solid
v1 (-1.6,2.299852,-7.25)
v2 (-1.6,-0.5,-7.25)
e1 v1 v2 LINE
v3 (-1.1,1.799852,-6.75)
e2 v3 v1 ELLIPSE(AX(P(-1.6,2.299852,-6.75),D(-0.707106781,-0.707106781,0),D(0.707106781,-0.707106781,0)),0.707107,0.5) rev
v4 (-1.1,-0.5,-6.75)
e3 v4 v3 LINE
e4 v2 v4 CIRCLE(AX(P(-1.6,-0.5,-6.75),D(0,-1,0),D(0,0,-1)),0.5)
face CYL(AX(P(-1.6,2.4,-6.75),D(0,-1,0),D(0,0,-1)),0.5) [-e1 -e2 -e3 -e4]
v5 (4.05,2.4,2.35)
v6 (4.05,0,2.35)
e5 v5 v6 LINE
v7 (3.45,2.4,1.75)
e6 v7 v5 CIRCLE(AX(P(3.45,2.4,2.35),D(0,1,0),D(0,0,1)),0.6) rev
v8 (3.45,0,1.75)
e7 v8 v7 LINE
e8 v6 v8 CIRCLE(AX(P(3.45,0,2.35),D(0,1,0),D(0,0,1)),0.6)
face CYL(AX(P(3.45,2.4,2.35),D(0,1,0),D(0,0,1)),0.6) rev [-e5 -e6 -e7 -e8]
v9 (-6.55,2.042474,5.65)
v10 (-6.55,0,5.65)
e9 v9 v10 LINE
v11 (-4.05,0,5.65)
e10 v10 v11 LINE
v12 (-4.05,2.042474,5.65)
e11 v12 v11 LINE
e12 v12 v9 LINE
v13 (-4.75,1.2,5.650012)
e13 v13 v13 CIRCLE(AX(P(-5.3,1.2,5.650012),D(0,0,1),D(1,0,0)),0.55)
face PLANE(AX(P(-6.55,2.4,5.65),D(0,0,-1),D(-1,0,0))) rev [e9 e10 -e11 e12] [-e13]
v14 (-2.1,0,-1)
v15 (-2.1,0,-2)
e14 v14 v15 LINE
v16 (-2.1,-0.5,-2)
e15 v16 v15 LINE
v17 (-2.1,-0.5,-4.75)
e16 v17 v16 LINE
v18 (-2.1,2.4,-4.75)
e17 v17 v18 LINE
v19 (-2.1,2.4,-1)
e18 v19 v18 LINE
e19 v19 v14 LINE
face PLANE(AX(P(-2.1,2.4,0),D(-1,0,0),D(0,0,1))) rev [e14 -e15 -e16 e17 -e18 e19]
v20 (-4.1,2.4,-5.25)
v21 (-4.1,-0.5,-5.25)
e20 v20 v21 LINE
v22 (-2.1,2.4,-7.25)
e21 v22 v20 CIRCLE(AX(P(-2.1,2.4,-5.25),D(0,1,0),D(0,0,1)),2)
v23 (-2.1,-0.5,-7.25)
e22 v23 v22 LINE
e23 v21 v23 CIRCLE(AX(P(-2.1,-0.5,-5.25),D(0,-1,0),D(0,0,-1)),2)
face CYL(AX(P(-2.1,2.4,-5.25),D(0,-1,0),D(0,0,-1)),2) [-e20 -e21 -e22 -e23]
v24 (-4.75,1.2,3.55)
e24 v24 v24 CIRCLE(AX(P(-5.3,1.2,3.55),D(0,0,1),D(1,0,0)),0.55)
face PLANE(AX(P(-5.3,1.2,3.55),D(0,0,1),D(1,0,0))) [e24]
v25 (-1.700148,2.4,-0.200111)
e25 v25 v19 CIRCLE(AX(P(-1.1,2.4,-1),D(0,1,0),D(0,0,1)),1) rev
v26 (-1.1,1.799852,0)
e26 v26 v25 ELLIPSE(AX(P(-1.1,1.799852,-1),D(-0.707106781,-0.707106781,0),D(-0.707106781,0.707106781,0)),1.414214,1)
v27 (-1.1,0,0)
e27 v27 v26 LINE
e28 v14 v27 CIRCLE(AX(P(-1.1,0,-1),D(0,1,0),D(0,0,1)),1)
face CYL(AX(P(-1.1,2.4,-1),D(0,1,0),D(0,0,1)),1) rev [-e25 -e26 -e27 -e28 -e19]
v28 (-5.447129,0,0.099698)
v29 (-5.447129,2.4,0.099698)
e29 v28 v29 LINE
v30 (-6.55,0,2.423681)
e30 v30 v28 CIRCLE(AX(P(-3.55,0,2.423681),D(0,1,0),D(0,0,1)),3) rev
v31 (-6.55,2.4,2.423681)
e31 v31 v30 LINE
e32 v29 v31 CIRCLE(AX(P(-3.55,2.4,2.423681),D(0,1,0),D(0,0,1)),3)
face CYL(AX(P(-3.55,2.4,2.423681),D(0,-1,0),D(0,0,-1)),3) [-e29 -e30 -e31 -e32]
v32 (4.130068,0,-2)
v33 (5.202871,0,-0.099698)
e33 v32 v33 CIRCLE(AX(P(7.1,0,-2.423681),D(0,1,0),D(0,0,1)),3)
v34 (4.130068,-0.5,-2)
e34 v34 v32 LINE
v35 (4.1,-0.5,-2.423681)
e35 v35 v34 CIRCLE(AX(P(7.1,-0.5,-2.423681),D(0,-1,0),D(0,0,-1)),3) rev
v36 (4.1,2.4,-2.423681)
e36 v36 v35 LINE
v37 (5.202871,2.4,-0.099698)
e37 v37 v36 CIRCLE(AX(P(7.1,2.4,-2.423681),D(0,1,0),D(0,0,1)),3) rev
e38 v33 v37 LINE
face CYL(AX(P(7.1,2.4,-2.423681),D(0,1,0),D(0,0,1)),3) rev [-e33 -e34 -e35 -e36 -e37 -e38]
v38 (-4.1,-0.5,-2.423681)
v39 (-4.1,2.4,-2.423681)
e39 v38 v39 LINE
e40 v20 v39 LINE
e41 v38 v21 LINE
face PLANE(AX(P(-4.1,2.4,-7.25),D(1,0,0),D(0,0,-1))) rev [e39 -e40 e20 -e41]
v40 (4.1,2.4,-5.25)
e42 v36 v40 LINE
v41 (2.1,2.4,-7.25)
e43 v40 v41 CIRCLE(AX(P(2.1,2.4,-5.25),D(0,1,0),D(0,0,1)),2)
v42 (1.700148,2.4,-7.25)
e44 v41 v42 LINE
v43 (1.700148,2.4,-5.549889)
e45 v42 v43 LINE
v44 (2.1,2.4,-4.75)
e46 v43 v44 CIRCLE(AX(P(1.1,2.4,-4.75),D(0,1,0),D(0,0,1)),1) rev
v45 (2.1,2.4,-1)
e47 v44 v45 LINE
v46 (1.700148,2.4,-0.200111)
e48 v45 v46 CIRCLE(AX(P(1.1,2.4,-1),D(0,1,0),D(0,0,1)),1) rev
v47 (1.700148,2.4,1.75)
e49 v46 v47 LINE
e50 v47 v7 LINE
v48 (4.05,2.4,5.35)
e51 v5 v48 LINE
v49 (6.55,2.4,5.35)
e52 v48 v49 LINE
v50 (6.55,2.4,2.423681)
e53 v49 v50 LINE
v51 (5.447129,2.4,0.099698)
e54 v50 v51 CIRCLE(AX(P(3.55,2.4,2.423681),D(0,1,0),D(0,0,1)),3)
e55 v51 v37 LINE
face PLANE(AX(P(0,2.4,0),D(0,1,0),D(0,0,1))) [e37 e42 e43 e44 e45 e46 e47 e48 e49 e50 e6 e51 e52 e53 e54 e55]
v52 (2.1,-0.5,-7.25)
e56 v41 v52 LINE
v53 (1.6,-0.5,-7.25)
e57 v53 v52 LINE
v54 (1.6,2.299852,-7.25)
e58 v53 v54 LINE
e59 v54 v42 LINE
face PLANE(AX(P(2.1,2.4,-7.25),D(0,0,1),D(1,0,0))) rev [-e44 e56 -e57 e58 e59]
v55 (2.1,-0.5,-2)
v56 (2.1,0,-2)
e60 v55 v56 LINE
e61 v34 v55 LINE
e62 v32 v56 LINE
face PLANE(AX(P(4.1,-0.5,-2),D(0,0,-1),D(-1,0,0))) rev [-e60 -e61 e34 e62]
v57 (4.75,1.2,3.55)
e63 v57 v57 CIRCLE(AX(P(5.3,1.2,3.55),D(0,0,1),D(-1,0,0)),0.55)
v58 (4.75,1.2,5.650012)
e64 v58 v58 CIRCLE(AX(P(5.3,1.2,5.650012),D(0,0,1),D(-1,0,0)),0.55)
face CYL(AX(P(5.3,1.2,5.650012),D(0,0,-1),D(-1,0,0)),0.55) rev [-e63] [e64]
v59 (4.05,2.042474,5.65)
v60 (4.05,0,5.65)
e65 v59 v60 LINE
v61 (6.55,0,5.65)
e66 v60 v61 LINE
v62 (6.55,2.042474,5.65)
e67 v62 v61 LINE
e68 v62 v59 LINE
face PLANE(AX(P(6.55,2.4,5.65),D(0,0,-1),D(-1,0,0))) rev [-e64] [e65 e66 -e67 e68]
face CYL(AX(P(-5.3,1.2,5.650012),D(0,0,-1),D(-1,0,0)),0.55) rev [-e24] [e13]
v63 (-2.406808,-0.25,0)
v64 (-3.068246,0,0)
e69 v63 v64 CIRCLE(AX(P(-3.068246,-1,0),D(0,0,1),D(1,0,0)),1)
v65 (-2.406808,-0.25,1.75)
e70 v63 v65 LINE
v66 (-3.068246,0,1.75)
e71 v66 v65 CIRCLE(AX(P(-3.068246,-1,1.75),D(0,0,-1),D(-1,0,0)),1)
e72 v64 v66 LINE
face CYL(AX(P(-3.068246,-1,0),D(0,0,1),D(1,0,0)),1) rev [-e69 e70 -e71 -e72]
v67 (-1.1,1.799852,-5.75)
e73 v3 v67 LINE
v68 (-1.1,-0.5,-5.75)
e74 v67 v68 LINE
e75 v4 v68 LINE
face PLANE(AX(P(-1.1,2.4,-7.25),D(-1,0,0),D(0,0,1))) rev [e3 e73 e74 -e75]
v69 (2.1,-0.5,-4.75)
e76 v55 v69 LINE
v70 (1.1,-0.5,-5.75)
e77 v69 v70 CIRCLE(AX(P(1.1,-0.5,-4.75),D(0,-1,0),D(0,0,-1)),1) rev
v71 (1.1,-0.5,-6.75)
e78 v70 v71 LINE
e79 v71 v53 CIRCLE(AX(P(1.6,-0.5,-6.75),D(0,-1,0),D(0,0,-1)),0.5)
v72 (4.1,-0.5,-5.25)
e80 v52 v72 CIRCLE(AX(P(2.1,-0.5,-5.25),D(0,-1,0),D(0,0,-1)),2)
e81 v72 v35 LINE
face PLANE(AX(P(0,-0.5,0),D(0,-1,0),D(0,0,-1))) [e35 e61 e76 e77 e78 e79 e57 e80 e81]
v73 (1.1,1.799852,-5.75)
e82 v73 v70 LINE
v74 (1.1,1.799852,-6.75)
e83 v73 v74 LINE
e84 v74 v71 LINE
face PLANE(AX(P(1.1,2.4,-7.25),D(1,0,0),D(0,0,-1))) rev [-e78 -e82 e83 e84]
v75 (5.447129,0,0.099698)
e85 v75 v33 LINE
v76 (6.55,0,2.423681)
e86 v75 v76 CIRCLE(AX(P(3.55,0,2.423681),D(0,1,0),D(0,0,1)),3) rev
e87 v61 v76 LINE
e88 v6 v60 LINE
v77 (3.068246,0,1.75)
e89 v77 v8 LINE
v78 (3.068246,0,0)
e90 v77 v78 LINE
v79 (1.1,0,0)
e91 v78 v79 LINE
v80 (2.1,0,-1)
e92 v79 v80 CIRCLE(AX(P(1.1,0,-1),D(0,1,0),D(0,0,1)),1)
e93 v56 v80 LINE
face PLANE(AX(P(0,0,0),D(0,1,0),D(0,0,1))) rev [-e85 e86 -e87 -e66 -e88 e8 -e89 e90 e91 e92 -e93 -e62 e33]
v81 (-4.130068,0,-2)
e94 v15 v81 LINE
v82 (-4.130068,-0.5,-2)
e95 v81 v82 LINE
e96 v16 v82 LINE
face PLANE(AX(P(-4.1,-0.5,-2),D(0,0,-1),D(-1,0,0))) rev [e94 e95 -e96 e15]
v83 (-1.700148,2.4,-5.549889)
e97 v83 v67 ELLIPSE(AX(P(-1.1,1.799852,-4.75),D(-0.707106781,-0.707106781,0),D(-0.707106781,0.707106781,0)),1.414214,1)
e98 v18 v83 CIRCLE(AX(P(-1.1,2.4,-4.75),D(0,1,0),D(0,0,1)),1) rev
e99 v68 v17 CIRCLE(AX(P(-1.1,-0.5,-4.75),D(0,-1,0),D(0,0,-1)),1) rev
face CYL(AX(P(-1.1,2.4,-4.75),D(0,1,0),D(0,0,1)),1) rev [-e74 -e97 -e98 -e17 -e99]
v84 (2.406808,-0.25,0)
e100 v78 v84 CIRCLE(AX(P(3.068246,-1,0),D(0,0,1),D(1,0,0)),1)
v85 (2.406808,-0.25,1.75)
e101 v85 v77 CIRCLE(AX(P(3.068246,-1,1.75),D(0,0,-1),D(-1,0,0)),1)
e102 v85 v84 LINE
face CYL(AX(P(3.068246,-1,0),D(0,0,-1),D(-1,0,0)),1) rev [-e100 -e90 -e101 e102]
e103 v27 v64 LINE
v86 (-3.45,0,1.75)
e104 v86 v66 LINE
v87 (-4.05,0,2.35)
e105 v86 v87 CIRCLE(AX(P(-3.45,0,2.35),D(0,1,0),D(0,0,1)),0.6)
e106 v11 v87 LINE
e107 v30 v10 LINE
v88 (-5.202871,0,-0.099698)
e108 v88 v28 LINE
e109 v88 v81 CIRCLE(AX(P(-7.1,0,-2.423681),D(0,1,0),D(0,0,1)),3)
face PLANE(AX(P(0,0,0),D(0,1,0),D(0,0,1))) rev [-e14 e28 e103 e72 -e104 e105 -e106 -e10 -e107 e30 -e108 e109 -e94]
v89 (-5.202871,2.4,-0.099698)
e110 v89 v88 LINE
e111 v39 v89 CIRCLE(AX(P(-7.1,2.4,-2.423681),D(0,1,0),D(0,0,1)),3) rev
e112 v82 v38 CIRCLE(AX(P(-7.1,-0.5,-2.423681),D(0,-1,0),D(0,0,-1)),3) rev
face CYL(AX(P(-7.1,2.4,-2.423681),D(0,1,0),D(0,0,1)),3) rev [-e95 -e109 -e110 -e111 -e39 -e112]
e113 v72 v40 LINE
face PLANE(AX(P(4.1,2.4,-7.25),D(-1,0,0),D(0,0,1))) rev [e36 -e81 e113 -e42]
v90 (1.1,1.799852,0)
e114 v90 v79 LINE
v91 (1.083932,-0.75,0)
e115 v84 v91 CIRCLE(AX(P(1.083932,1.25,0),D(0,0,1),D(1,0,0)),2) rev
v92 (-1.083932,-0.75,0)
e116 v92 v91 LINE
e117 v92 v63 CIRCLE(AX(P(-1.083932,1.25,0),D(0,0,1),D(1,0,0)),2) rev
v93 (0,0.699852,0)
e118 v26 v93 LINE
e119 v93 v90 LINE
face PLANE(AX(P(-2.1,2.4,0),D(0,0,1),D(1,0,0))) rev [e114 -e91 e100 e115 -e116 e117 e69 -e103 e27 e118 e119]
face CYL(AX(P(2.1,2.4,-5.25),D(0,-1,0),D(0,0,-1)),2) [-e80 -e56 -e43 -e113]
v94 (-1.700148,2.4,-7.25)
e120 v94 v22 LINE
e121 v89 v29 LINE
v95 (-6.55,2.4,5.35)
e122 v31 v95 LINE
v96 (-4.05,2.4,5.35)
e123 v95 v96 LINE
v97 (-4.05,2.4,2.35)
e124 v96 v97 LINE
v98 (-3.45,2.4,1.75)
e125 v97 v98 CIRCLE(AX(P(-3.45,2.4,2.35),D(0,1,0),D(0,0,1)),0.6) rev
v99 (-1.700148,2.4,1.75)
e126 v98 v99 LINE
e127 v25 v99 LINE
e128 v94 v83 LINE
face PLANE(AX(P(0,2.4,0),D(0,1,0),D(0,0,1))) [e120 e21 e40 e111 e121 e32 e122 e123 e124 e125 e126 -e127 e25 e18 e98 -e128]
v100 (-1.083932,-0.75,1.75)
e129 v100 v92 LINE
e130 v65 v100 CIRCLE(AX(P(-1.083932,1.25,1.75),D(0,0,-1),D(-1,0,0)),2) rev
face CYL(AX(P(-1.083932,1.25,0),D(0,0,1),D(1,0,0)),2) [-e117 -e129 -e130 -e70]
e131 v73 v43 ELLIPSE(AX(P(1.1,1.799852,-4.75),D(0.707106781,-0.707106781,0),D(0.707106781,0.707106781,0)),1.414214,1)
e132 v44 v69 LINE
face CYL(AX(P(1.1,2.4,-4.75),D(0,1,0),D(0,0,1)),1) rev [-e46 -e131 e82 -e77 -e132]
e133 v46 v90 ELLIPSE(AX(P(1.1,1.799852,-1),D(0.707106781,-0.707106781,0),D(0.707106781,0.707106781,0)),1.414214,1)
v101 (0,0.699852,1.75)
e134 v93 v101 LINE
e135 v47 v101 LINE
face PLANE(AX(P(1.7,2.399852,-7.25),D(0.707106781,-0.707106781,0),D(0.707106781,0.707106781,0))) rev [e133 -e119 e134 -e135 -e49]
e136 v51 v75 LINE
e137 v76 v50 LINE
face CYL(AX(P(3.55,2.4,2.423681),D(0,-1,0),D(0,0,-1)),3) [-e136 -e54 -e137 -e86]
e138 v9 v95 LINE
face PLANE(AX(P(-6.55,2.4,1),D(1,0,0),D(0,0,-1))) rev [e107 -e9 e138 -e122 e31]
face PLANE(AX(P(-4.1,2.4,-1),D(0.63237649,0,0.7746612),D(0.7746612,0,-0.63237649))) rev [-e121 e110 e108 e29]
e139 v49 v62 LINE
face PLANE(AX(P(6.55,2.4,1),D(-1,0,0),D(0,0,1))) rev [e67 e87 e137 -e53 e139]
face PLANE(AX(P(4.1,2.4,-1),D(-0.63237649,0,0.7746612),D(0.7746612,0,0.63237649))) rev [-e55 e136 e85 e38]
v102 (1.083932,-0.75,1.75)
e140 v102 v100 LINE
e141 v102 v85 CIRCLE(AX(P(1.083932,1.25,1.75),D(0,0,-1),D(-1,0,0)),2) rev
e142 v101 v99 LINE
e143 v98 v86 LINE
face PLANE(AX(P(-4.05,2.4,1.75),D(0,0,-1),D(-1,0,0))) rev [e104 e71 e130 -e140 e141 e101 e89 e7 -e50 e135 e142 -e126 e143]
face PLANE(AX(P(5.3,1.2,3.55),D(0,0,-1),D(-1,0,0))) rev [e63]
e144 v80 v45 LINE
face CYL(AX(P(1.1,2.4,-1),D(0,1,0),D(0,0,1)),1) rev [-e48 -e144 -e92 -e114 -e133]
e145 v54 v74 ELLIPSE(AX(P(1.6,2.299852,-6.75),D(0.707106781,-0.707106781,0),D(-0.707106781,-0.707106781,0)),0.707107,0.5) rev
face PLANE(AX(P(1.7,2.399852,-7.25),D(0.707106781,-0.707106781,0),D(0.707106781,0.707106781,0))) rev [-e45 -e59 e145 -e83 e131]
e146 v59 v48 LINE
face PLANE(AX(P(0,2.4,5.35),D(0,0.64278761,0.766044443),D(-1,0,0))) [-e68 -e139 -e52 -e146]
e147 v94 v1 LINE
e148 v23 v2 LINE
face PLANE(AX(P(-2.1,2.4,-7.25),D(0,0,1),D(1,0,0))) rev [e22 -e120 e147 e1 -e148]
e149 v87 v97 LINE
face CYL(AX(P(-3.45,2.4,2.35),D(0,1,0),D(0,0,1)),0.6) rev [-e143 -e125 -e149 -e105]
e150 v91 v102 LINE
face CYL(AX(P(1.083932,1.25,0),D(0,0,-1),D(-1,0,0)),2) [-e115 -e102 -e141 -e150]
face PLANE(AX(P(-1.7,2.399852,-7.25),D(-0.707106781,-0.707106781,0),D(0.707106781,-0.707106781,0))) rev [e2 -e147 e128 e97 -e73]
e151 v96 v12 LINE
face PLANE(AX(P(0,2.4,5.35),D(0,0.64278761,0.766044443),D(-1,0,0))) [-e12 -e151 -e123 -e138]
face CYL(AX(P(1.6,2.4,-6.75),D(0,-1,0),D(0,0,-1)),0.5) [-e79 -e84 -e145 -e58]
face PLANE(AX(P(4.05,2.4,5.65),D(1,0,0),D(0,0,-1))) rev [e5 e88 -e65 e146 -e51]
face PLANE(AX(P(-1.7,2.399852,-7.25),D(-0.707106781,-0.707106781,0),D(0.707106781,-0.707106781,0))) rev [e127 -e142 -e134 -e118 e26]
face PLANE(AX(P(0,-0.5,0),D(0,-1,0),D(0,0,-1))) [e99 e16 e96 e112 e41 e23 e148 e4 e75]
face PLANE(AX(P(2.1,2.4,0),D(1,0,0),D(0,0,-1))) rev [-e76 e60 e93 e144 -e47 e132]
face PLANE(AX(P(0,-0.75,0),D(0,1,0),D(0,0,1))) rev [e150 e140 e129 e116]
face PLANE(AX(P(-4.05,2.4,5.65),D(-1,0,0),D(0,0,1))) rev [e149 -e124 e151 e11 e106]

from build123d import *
from OCP.BRepFilletAPI import BRepFilletAPI_MakeChamfer

# Parameters (mm, degrees)
BOSS_EXTRUDE1_DEPTH     = 2.4
CUT_EXTRUDE1_DEPTH      = 15.66535032
CUT_EXTRUDE1_DEPTH_BACK = 2.1
SKETCH4_R               = 0.55
CUT_EXTRUDE2_START      = -9
CUT_EXTRUDE2_DEPTH      = 9
SKETCH6_W               = 4.2
SKETCH6_H               = 1.75
BOSS_EXTRUDE2_DEPTH     = 0.75
BOSS_EXTRUDE3_DEPTH     = 0.5
FILLET1_R               = 1
FILLET2_R               = 2
FILLET3_R               = 1
FILLET4_R               = 2
FILLET6_R               = 0.5
FILLET8_R               = 0.6
FILLET9_R               = 3
FILLET10_R              = 3
CHAMFER1_SIZE           = 0.3
CHAMFER1_SIZE2          = 0.357526078


# Read off the part's stored shape, not the designer's step: Cut-Extrude2
# Some blends are built 0.0001 mm under size
with BuildPart() as part:
    # Sketch1 → Boss-Extrude1 (new body)
    with BuildSketch(Plane(origin=(0, 0, 0), x_dir=(1, 0, 0), z_dir=(0, 1, 0))):
        Polygon((-2.1, 0), (-2.1, 5.75), (-1.1, 5.75), (-1.1, 7.25), (-2.1, 7.25), (-4.1, 7.25), (-4.1, 1), (-6.55, -1), (-6.55, -5.65), (-4.05, -5.65), (-4.05, -1.75), (4.05, -1.75), (4.05, -5.65), (6.55, -5.65), (6.55, -1), (4.1, 1), (4.1, 7.25), (2.1, 7.25), (1.1, 7.25), (1.1, 5.75), (2.1, 5.75), (2.1, 0), align=None)
    extrude(amount=BOSS_EXTRUDE1_DEPTH)

    # Sketch4 → Cut-Extrude1 (cut, two sides: drawn at the far end of the back side and taken through both)
    with BuildSketch(Plane.XY.offset(5.65).offset(-CUT_EXTRUDE1_DEPTH_BACK)):
        with Locations((-5.3, 1.2)):
            Circle(SKETCH4_R)
        with Locations(Location((5.3, 1.2, 0), (0, 0, 180))):
            Circle(SKETCH4_R)
    extrude(amount=CUT_EXTRUDE1_DEPTH + CUT_EXTRUDE1_DEPTH_BACK, mode=Mode.SUBTRACT)

    # Cut-Extrude2 outline → Cut-Extrude2 (cut)
    with BuildSketch(Plane.XY.offset(1.75).offset(CUT_EXTRUDE2_START)):
        Polygon((-1.700147862, 2.4), (0, 0.699852138), (1.700147862, 2.4), align=None)
    extrude(amount=CUT_EXTRUDE2_DEPTH, mode=Mode.SUBTRACT)

    # Sketch6 → Boss-Extrude2 (add)
    with BuildSketch(Plane.XZ):
        with Locations((0, 0.875)):
            Rectangle(SKETCH6_W, SKETCH6_H)
    extrude(amount=BOSS_EXTRUDE2_DEPTH)

    # Sketch7 → Boss-Extrude3 (add)
    with BuildSketch(Plane.XZ):
        Polygon((-2.1, -5.75), (-1.1, -5.75), (-1.1, -7.25), (-4.1, -7.25), (-4.1, -2), (-2.1, -2), align=None)
        Polygon((4.1, -2), (2.1, -2), (2.1, -5.75), (1.1, -5.75), (1.1, -7.25), (4.1, -7.25), align=None)
    extrude(amount=BOSS_EXTRUDE3_DEPTH)

    # Fillet1
    # the kernel refuses this fillet: 1 mm, written as the material it adds along each edge
    with BuildSketch(Plane(origin=(-2.1, 0, 1.75), x_dir=(-1, 0, 0), z_dir=(0, 0, -1))) as fillet1_piece_1:
        with BuildLine():
            CenterArc((0.968245837, -1), FILLET1_R, 90, 75.522487814)
            Line((0, -0.75), (0, 0))
            Line((0, 0), (0.968245837, 0))
        make_face()
    extrude(amount=1.75)
    with BuildSketch(Plane(origin=(2.1, 0, 0), x_dir=(0, -1, 0), z_dir=(0, 0, 1))) as fillet1_piece_2:
        with BuildLine():
            CenterArc((1, 0.968245837), FILLET1_R, 180, 75.522487814)
            Line((0, 0.968245837), (0, 0))
            Line((0, 0), (0.75, 0))
        make_face()
    extrude(amount=1.75)

    # Fillet2
    fillet2_edges = [part.edges().sort_by_distance(p)[0] for p in [
        (-2.1, -0.75, 0.875),
        (2.1, -0.75, 0.875),
    ]]
    fillet(fillet2_edges, radius=FILLET2_R)

    # Fillet3
    fillet3_edges = [part.edges().sort_by_distance(p)[0] for p in [
        (-2.1, 0.95, -5.75),
        (2.1, 0.95, -5.75),
        (-2.1, 1.2, 0),
        (2.1, 1.2, 0),
    ]]
    fillet(fillet3_edges, radius=FILLET3_R - 0.0001)  # a hair under: the kernel refuses the full size

    # Fillet4
    fillet4_edges = [part.edges().sort_by_distance(p)[0] for p in [
        (-4.1, 0.95, -7.25),
        (4.1, 0.95, -7.25),
    ]]
    fillet(fillet4_edges, radius=FILLET4_R)

    # Fillet6
    fillet6_edges = [part.edges().sort_by_distance(p)[0] for p in [
        (-1.1, 0.649926069, -7.25),
        (1.1, 0.649926069, -7.25),
    ]]
    fillet(fillet6_edges, radius=FILLET6_R)

    # Fillet8
    fillet8_edges = [part.edges().sort_by_distance(p)[0] for p in [
        (-4.05, 1.2, 1.75),
        (4.05, 1.2, 1.75),
    ]]
    fillet(fillet8_edges, radius=FILLET8_R)

    # Fillet9
    fillet9_edges = [part.edges().sort_by_distance(p)[0] for p in [
        (-6.55, 1.2, 1),
        (6.55, 1.2, 1),
    ]]
    fillet(fillet9_edges, radius=FILLET9_R)

    # Fillet10
    fillet10_edges = [part.edges().sort_by_distance(p)[0] for p in [
        (-4.1, 1.2, -1),
        (4.1, 1.2, -1),
    ]]
    fillet(fillet10_edges, radius=FILLET10_R)

    # Chamfer1: one chamfer whose edges measure the first distance from different faces: ONE call of the kernel's chamfer builder (chamfer() names one face for all edges)
    chamfer1_edges_1 = [part.edges().sort_by_distance(p)[0] for p in [
        (5.3, 2.4, 5.65),
    ]]
    chamfer1_side_1 = [part.faces().sort_by_distance(p)[0] for p in [
        (3.921880383, 2.4, -0.274216986),
    ]]
    chamfer1_edges_2 = [part.edges().sort_by_distance(p)[0] for p in [
        (-5.3, 2.4, 5.65),
    ]]
    chamfer1_side_2 = [part.faces().sort_by_distance(p)[0] for p in [
        (-3.921880383, 2.4, -0.274216986),
    ]]
    chamfer1 = BRepFilletAPI_MakeChamfer(part.part.solid().wrapped)
    for e in chamfer1_edges_1:
        chamfer1.Add(CHAMFER1_SIZE, CHAMFER1_SIZE2, e.wrapped, chamfer1_side_1[0].wrapped)  # the first distance lies on this face
    for e in chamfer1_edges_2:
        chamfer1.Add(CHAMFER1_SIZE, CHAMFER1_SIZE2, e.wrapped, chamfer1_side_2[0].wrapped)  # the first distance lies on this face
    add(Compound.cast(chamfer1.Shape()), mode=Mode.REPLACE)


solid = part.part
